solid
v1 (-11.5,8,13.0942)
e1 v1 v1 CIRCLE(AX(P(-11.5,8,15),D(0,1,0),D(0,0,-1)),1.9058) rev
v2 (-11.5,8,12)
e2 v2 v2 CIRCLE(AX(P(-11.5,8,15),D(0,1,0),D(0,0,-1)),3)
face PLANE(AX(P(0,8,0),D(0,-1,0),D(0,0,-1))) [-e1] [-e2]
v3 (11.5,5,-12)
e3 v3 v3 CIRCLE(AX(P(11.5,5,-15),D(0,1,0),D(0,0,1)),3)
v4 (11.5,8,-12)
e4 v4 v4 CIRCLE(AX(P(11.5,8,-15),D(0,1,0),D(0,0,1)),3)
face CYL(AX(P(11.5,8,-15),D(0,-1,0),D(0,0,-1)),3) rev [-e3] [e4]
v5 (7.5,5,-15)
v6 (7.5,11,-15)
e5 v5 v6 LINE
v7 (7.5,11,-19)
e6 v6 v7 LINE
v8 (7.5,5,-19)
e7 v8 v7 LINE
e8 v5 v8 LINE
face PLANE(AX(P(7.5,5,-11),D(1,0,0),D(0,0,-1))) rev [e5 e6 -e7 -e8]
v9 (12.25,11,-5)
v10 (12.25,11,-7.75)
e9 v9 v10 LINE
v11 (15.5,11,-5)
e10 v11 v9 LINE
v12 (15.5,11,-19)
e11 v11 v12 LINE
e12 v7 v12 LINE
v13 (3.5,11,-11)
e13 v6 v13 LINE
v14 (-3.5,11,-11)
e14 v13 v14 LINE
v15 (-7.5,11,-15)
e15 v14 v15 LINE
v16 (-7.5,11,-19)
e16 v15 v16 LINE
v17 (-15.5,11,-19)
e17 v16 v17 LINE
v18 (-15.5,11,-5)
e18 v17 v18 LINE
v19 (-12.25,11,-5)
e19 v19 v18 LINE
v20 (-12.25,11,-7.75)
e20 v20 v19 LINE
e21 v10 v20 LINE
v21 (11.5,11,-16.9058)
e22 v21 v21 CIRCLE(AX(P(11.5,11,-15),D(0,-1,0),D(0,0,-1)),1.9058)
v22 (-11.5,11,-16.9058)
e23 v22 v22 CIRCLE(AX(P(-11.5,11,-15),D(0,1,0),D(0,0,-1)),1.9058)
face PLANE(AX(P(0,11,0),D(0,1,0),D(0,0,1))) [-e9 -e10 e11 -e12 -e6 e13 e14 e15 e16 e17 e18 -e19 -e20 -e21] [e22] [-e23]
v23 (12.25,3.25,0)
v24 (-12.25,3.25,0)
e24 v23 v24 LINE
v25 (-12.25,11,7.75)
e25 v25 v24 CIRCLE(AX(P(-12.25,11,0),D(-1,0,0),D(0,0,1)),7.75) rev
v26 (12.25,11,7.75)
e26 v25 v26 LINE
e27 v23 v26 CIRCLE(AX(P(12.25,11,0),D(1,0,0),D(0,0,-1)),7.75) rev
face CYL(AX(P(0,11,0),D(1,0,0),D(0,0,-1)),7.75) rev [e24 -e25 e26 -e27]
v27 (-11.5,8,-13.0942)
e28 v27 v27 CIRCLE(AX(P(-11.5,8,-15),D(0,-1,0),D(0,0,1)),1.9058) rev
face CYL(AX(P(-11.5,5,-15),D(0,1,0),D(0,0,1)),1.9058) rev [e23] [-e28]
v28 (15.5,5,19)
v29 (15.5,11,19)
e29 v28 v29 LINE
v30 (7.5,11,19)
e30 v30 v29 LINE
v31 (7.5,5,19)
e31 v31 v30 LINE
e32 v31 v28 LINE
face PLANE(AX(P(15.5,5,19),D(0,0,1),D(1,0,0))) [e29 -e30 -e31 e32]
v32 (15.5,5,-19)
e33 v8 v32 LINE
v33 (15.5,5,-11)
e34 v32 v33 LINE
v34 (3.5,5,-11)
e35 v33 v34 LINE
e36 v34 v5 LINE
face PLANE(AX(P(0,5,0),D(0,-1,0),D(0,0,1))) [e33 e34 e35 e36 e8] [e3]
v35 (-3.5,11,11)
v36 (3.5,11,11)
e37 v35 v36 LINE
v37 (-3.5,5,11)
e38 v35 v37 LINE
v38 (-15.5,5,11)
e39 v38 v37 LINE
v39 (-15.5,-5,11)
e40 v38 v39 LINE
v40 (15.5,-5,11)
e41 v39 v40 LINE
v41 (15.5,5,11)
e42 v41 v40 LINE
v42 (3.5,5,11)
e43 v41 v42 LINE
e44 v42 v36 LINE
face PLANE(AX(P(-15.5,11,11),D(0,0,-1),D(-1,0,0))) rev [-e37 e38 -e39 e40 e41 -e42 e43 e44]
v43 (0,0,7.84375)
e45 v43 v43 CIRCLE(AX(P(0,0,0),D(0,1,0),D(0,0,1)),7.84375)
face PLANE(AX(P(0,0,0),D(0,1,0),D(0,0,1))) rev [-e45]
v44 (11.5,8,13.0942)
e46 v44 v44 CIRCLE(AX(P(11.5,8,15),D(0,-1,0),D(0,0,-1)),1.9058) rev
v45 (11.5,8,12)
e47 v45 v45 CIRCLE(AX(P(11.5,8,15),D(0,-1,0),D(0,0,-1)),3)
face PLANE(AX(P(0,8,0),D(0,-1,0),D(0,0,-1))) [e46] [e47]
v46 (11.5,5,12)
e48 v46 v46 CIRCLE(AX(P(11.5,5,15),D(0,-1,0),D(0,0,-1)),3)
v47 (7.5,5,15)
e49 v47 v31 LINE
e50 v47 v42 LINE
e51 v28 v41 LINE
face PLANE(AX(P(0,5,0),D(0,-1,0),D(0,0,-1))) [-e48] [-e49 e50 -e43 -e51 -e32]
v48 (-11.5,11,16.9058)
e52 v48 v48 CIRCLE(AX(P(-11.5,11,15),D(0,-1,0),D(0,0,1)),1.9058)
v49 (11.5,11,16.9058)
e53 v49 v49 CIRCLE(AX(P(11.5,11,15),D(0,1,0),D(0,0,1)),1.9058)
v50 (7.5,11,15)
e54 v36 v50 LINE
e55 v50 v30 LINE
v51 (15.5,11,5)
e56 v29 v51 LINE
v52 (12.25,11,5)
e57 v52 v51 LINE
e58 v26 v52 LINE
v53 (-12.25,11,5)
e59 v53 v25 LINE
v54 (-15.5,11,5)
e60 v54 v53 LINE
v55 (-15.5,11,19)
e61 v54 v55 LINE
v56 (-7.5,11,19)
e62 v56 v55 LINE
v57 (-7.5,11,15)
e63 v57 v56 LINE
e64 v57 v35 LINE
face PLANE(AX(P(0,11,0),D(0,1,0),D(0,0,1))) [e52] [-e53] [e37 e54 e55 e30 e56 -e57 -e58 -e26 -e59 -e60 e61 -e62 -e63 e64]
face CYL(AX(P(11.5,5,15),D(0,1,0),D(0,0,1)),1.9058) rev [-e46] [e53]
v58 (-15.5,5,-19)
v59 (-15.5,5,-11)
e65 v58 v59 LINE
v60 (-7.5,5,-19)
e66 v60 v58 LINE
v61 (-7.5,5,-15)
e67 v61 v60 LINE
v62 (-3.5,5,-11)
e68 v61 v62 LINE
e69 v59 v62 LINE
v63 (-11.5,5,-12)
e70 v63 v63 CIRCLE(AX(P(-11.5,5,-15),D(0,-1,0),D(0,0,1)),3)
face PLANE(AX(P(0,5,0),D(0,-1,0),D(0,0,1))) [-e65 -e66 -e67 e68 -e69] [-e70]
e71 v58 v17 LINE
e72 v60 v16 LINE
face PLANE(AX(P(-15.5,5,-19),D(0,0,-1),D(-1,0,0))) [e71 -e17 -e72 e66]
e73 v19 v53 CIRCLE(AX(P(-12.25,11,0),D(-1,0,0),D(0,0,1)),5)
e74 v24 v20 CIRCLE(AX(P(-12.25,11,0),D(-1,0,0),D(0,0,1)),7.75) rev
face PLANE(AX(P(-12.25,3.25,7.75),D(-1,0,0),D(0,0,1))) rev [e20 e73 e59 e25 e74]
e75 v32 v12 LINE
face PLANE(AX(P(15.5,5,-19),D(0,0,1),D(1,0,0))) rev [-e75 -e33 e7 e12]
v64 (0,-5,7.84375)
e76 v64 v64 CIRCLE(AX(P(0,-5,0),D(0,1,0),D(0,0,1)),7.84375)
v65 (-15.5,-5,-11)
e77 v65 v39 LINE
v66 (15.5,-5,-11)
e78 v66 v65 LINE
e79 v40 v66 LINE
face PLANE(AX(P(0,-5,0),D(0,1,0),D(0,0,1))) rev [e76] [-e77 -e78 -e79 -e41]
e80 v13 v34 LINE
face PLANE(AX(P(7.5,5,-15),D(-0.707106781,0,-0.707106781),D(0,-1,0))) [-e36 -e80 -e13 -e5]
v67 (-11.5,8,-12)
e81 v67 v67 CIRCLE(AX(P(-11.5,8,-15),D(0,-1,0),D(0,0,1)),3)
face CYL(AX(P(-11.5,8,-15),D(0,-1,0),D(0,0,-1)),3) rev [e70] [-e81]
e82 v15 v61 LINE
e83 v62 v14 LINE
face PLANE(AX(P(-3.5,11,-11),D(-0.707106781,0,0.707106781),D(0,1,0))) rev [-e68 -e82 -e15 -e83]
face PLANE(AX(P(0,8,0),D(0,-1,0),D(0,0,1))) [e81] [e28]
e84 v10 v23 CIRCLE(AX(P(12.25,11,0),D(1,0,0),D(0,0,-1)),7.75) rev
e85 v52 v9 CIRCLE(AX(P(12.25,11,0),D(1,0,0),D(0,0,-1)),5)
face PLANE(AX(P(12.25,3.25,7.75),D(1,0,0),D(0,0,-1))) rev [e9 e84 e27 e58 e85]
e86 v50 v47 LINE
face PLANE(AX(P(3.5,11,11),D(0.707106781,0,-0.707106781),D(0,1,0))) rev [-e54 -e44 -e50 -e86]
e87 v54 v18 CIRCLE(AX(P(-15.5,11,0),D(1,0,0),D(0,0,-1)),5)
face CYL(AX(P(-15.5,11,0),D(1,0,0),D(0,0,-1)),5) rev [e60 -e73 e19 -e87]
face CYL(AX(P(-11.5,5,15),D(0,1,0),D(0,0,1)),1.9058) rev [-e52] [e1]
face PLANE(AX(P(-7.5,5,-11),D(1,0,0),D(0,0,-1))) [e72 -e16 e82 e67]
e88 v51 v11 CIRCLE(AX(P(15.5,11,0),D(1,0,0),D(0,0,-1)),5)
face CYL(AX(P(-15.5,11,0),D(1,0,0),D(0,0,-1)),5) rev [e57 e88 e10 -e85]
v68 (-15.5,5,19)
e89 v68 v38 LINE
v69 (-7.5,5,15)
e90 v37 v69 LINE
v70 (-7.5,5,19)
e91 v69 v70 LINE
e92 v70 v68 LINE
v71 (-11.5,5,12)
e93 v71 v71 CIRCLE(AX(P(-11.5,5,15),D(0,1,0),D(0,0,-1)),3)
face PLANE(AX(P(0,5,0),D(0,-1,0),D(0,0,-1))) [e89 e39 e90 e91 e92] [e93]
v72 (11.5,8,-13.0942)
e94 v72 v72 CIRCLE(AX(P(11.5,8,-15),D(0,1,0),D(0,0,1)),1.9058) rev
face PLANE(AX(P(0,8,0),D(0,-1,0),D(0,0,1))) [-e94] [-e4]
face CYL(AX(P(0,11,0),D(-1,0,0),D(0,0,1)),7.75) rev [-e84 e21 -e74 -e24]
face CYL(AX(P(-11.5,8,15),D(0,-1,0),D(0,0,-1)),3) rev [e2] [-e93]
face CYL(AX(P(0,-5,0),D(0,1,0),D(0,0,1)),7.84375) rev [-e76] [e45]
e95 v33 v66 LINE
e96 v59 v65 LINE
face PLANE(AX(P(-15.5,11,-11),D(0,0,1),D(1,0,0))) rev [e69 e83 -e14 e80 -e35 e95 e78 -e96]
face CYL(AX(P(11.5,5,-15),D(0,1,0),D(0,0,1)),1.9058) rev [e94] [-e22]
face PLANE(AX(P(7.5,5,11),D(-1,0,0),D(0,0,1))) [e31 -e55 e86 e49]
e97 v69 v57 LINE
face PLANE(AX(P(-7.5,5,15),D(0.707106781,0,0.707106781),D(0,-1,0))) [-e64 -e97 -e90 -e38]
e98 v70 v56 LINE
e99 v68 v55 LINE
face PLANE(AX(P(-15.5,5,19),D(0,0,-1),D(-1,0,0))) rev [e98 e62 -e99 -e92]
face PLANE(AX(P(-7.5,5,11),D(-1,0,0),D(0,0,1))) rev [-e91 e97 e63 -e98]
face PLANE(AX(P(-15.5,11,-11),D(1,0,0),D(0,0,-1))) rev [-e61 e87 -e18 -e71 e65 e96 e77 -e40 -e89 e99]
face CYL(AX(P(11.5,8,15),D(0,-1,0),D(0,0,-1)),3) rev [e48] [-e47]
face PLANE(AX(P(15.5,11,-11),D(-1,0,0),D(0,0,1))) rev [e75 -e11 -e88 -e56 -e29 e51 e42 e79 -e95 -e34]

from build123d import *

# Parameters (mm, degrees)
SKETCH1_W                 = 31
SKETCH1_H                 = 22
BOSS_EXTRUDE1_DEPTH       = 11
SKETCH2_W                 = 31
SKETCH2_H                 = 22
SKETCH2_R                 = 7.843750423
BOSS_EXTRUDE2_DEPTH       = 5
SKETCH3_W                 = 24.5
SKETCH3_H                 = 15.5
CUT_EXTRUDE1_DEPTH        = 7.75
FILLET1_R                 = 7.75
CUT_EXTRUDE2_DEPTH        = 32.812929761
CUT_EXTRUDE2_DEPTH_BACK   = 32.812929761
SKETCH4_R                 = 5
SKETCH5_W                 = 8
SKETCH5_H                 = 8
SKETCH5_R                 = 1.905800151
BOSS_EXTRUDE3_DEPTH       = 6
CUT_EXTRUDE3_START        = -3
SKETCH6_R                 = 3
SKETCH6_R_2               = 1.905800151
CUT_EXTRUDE3_DEPTH        = 3
MIRROR9_COPY_1_SKETCH_W   = 8
MIRROR9_COPY_1_SKETCH_H   = 8
MIRROR9_COPY_1_SKETCH_R   = 1.905800151
MIRROR9_COPY_1_DEPTH      = 6
MIRROR9_START             = -3
MIRROR9_COPY_2_SKETCH_R   = 3
MIRROR9_COPY_2_SKETCH_R_2 = 1.905800151
MIRROR9_COPY_2_DEPTH      = 3
CHAMFER2_SIZE             = 4


with BuildPart() as part:
    # Sketch1 → Boss-Extrude1 (new body)
    with BuildSketch(Plane(origin=(0, 0, 0), x_dir=(1, 0, 0), z_dir=(0, 1, 0))):
        Rectangle(SKETCH1_W, SKETCH1_H)
    extrude(amount=BOSS_EXTRUDE1_DEPTH)

    # Sketch2 → Boss-Extrude2 (add)
    with BuildSketch(Plane(origin=(0, 0, 0), x_dir=(1, 0, 0), z_dir=(0, 1, 0))):
        Rectangle(SKETCH2_W, SKETCH2_H)
        with Locations(Location((0, 0, 0), (0, 0, 270))):
            Circle(SKETCH2_R, mode=Mode.SUBTRACT)
    extrude(amount=-BOSS_EXTRUDE2_DEPTH)

    # Sketch3 → Cut-Extrude1 (cut)
    with BuildSketch(Plane(origin=(0, 11, 0), x_dir=(1, 0, 0), z_dir=(0, 1, 0))):
        Rectangle(SKETCH3_W, SKETCH3_H)
    extrude(amount=-CUT_EXTRUDE1_DEPTH, mode=Mode.SUBTRACT)

    # Fillet1
    fillet1_edges = [part.edges().sort_by_distance(p)[0] for p in [
        (0, 3.25, 7.75),
        (0, 3.25, -7.75),
    ]]
    fillet(fillet1_edges, radius=FILLET1_R - 0.0001)  # a hair under: the kernel refuses the full size

    # Sketch4 → Cut-Extrude2 (cut, two sides: drawn at the far end of the back side and taken through both)
    with BuildSketch(Plane(origin=(-12.25, 0, 0), x_dir=(0, 0, -1), z_dir=(1, 0, 0)).offset(-CUT_EXTRUDE2_DEPTH_BACK)):
        with Locations((0, 11)):
            Circle(SKETCH4_R)
    extrude(amount=CUT_EXTRUDE2_DEPTH + CUT_EXTRUDE2_DEPTH_BACK, mode=Mode.SUBTRACT)

    # Sketch5 → Boss-Extrude3 (add)
    with BuildSketch(Plane(origin=(0, 11, 0), x_dir=(1, 0, 0), z_dir=(0, 1, 0))):
        with Locations((11.5, -15)):
            Rectangle(SKETCH5_W, SKETCH5_H)
        with Locations(Location((11.5, -15, 0), (0, 0, 270))):
            Circle(SKETCH5_R, mode=Mode.SUBTRACT)
    boss_extrude3 = extrude(amount=-BOSS_EXTRUDE3_DEPTH)

    # Sketch6 → Cut-Extrude3 (cut)
    with BuildSketch(Plane.XZ.offset(-5).offset(CUT_EXTRUDE3_START)):
        with Locations(Location((11.5, 15, 0), (0, 0, 270))):
            Circle(SKETCH6_R)
        with Locations(Location((11.5, 15, 0), (0, 0, 90))):
            Circle(SKETCH6_R_2, mode=Mode.SUBTRACT)
    cut_extrude3 = extrude(amount=CUT_EXTRUDE3_DEPTH, mode=Mode.SUBTRACT)

    # Mirror8: Boss-Extrude3, Cut-Extrude3 across plane
    add(boss_extrude3.mirror(Plane(origin=(0, 0, 0), x_dir=(0, 0, 1), z_dir=(1, 0, 0))))
    add(cut_extrude3.mirror(Plane(origin=(0, 0, 0), x_dir=(0, 0, 1), z_dir=(1, 0, 0))), mode=Mode.SUBTRACT)

    # Mirror9: Boss-Extrude3, Cut-Extrude3 across plane
    add(boss_extrude3.mirror(Plane.XY))
    add(cut_extrude3.mirror(Plane.XY), mode=Mode.SUBTRACT)

    # Mirror9 copy 1 sketch → Mirror9 copy 1 (add)
    with BuildSketch(Plane(origin=(0, 11, 0), x_dir=(-1, 0, 0), z_dir=(0, 1, 0))):
        with Locations((11.5, -15)):
            Rectangle(MIRROR9_COPY_1_SKETCH_W, MIRROR9_COPY_1_SKETCH_H)
        with Locations(Location((11.5, -15, 0), (0, 0, 270))):
            Circle(MIRROR9_COPY_1_SKETCH_R, mode=Mode.SUBTRACT)
    extrude(amount=-MIRROR9_COPY_1_DEPTH)

    # Mirror9 copy 2 sketch → Mirror9 copy 2 (cut)
    with BuildSketch(Plane(origin=(0, 5, 0), x_dir=(-1, 0, 0), z_dir=(0, -1, 0)).offset(MIRROR9_START)):
        with Locations(Location((11.5, 15, 0), (0, 0, 270))):
            Circle(MIRROR9_COPY_2_SKETCH_R)
        with Locations(Location((11.5, 15, 0), (0, 0, 90))):
            Circle(MIRROR9_COPY_2_SKETCH_R_2, mode=Mode.SUBTRACT)
    extrude(amount=MIRROR9_COPY_2_DEPTH, mode=Mode.SUBTRACT)

    # Chamfer2
    chamfer2_edges = [part.edges().sort_by_distance(p)[0] for p in [
        (-7.5, 8, -11),
        (7.5, 8, -11),
        (7.5, 8, 11),
        (-7.5, 8, 11),
    ]]
    chamfer(chamfer2_edges, length=CHAMFER2_SIZE)


solid = part.part
